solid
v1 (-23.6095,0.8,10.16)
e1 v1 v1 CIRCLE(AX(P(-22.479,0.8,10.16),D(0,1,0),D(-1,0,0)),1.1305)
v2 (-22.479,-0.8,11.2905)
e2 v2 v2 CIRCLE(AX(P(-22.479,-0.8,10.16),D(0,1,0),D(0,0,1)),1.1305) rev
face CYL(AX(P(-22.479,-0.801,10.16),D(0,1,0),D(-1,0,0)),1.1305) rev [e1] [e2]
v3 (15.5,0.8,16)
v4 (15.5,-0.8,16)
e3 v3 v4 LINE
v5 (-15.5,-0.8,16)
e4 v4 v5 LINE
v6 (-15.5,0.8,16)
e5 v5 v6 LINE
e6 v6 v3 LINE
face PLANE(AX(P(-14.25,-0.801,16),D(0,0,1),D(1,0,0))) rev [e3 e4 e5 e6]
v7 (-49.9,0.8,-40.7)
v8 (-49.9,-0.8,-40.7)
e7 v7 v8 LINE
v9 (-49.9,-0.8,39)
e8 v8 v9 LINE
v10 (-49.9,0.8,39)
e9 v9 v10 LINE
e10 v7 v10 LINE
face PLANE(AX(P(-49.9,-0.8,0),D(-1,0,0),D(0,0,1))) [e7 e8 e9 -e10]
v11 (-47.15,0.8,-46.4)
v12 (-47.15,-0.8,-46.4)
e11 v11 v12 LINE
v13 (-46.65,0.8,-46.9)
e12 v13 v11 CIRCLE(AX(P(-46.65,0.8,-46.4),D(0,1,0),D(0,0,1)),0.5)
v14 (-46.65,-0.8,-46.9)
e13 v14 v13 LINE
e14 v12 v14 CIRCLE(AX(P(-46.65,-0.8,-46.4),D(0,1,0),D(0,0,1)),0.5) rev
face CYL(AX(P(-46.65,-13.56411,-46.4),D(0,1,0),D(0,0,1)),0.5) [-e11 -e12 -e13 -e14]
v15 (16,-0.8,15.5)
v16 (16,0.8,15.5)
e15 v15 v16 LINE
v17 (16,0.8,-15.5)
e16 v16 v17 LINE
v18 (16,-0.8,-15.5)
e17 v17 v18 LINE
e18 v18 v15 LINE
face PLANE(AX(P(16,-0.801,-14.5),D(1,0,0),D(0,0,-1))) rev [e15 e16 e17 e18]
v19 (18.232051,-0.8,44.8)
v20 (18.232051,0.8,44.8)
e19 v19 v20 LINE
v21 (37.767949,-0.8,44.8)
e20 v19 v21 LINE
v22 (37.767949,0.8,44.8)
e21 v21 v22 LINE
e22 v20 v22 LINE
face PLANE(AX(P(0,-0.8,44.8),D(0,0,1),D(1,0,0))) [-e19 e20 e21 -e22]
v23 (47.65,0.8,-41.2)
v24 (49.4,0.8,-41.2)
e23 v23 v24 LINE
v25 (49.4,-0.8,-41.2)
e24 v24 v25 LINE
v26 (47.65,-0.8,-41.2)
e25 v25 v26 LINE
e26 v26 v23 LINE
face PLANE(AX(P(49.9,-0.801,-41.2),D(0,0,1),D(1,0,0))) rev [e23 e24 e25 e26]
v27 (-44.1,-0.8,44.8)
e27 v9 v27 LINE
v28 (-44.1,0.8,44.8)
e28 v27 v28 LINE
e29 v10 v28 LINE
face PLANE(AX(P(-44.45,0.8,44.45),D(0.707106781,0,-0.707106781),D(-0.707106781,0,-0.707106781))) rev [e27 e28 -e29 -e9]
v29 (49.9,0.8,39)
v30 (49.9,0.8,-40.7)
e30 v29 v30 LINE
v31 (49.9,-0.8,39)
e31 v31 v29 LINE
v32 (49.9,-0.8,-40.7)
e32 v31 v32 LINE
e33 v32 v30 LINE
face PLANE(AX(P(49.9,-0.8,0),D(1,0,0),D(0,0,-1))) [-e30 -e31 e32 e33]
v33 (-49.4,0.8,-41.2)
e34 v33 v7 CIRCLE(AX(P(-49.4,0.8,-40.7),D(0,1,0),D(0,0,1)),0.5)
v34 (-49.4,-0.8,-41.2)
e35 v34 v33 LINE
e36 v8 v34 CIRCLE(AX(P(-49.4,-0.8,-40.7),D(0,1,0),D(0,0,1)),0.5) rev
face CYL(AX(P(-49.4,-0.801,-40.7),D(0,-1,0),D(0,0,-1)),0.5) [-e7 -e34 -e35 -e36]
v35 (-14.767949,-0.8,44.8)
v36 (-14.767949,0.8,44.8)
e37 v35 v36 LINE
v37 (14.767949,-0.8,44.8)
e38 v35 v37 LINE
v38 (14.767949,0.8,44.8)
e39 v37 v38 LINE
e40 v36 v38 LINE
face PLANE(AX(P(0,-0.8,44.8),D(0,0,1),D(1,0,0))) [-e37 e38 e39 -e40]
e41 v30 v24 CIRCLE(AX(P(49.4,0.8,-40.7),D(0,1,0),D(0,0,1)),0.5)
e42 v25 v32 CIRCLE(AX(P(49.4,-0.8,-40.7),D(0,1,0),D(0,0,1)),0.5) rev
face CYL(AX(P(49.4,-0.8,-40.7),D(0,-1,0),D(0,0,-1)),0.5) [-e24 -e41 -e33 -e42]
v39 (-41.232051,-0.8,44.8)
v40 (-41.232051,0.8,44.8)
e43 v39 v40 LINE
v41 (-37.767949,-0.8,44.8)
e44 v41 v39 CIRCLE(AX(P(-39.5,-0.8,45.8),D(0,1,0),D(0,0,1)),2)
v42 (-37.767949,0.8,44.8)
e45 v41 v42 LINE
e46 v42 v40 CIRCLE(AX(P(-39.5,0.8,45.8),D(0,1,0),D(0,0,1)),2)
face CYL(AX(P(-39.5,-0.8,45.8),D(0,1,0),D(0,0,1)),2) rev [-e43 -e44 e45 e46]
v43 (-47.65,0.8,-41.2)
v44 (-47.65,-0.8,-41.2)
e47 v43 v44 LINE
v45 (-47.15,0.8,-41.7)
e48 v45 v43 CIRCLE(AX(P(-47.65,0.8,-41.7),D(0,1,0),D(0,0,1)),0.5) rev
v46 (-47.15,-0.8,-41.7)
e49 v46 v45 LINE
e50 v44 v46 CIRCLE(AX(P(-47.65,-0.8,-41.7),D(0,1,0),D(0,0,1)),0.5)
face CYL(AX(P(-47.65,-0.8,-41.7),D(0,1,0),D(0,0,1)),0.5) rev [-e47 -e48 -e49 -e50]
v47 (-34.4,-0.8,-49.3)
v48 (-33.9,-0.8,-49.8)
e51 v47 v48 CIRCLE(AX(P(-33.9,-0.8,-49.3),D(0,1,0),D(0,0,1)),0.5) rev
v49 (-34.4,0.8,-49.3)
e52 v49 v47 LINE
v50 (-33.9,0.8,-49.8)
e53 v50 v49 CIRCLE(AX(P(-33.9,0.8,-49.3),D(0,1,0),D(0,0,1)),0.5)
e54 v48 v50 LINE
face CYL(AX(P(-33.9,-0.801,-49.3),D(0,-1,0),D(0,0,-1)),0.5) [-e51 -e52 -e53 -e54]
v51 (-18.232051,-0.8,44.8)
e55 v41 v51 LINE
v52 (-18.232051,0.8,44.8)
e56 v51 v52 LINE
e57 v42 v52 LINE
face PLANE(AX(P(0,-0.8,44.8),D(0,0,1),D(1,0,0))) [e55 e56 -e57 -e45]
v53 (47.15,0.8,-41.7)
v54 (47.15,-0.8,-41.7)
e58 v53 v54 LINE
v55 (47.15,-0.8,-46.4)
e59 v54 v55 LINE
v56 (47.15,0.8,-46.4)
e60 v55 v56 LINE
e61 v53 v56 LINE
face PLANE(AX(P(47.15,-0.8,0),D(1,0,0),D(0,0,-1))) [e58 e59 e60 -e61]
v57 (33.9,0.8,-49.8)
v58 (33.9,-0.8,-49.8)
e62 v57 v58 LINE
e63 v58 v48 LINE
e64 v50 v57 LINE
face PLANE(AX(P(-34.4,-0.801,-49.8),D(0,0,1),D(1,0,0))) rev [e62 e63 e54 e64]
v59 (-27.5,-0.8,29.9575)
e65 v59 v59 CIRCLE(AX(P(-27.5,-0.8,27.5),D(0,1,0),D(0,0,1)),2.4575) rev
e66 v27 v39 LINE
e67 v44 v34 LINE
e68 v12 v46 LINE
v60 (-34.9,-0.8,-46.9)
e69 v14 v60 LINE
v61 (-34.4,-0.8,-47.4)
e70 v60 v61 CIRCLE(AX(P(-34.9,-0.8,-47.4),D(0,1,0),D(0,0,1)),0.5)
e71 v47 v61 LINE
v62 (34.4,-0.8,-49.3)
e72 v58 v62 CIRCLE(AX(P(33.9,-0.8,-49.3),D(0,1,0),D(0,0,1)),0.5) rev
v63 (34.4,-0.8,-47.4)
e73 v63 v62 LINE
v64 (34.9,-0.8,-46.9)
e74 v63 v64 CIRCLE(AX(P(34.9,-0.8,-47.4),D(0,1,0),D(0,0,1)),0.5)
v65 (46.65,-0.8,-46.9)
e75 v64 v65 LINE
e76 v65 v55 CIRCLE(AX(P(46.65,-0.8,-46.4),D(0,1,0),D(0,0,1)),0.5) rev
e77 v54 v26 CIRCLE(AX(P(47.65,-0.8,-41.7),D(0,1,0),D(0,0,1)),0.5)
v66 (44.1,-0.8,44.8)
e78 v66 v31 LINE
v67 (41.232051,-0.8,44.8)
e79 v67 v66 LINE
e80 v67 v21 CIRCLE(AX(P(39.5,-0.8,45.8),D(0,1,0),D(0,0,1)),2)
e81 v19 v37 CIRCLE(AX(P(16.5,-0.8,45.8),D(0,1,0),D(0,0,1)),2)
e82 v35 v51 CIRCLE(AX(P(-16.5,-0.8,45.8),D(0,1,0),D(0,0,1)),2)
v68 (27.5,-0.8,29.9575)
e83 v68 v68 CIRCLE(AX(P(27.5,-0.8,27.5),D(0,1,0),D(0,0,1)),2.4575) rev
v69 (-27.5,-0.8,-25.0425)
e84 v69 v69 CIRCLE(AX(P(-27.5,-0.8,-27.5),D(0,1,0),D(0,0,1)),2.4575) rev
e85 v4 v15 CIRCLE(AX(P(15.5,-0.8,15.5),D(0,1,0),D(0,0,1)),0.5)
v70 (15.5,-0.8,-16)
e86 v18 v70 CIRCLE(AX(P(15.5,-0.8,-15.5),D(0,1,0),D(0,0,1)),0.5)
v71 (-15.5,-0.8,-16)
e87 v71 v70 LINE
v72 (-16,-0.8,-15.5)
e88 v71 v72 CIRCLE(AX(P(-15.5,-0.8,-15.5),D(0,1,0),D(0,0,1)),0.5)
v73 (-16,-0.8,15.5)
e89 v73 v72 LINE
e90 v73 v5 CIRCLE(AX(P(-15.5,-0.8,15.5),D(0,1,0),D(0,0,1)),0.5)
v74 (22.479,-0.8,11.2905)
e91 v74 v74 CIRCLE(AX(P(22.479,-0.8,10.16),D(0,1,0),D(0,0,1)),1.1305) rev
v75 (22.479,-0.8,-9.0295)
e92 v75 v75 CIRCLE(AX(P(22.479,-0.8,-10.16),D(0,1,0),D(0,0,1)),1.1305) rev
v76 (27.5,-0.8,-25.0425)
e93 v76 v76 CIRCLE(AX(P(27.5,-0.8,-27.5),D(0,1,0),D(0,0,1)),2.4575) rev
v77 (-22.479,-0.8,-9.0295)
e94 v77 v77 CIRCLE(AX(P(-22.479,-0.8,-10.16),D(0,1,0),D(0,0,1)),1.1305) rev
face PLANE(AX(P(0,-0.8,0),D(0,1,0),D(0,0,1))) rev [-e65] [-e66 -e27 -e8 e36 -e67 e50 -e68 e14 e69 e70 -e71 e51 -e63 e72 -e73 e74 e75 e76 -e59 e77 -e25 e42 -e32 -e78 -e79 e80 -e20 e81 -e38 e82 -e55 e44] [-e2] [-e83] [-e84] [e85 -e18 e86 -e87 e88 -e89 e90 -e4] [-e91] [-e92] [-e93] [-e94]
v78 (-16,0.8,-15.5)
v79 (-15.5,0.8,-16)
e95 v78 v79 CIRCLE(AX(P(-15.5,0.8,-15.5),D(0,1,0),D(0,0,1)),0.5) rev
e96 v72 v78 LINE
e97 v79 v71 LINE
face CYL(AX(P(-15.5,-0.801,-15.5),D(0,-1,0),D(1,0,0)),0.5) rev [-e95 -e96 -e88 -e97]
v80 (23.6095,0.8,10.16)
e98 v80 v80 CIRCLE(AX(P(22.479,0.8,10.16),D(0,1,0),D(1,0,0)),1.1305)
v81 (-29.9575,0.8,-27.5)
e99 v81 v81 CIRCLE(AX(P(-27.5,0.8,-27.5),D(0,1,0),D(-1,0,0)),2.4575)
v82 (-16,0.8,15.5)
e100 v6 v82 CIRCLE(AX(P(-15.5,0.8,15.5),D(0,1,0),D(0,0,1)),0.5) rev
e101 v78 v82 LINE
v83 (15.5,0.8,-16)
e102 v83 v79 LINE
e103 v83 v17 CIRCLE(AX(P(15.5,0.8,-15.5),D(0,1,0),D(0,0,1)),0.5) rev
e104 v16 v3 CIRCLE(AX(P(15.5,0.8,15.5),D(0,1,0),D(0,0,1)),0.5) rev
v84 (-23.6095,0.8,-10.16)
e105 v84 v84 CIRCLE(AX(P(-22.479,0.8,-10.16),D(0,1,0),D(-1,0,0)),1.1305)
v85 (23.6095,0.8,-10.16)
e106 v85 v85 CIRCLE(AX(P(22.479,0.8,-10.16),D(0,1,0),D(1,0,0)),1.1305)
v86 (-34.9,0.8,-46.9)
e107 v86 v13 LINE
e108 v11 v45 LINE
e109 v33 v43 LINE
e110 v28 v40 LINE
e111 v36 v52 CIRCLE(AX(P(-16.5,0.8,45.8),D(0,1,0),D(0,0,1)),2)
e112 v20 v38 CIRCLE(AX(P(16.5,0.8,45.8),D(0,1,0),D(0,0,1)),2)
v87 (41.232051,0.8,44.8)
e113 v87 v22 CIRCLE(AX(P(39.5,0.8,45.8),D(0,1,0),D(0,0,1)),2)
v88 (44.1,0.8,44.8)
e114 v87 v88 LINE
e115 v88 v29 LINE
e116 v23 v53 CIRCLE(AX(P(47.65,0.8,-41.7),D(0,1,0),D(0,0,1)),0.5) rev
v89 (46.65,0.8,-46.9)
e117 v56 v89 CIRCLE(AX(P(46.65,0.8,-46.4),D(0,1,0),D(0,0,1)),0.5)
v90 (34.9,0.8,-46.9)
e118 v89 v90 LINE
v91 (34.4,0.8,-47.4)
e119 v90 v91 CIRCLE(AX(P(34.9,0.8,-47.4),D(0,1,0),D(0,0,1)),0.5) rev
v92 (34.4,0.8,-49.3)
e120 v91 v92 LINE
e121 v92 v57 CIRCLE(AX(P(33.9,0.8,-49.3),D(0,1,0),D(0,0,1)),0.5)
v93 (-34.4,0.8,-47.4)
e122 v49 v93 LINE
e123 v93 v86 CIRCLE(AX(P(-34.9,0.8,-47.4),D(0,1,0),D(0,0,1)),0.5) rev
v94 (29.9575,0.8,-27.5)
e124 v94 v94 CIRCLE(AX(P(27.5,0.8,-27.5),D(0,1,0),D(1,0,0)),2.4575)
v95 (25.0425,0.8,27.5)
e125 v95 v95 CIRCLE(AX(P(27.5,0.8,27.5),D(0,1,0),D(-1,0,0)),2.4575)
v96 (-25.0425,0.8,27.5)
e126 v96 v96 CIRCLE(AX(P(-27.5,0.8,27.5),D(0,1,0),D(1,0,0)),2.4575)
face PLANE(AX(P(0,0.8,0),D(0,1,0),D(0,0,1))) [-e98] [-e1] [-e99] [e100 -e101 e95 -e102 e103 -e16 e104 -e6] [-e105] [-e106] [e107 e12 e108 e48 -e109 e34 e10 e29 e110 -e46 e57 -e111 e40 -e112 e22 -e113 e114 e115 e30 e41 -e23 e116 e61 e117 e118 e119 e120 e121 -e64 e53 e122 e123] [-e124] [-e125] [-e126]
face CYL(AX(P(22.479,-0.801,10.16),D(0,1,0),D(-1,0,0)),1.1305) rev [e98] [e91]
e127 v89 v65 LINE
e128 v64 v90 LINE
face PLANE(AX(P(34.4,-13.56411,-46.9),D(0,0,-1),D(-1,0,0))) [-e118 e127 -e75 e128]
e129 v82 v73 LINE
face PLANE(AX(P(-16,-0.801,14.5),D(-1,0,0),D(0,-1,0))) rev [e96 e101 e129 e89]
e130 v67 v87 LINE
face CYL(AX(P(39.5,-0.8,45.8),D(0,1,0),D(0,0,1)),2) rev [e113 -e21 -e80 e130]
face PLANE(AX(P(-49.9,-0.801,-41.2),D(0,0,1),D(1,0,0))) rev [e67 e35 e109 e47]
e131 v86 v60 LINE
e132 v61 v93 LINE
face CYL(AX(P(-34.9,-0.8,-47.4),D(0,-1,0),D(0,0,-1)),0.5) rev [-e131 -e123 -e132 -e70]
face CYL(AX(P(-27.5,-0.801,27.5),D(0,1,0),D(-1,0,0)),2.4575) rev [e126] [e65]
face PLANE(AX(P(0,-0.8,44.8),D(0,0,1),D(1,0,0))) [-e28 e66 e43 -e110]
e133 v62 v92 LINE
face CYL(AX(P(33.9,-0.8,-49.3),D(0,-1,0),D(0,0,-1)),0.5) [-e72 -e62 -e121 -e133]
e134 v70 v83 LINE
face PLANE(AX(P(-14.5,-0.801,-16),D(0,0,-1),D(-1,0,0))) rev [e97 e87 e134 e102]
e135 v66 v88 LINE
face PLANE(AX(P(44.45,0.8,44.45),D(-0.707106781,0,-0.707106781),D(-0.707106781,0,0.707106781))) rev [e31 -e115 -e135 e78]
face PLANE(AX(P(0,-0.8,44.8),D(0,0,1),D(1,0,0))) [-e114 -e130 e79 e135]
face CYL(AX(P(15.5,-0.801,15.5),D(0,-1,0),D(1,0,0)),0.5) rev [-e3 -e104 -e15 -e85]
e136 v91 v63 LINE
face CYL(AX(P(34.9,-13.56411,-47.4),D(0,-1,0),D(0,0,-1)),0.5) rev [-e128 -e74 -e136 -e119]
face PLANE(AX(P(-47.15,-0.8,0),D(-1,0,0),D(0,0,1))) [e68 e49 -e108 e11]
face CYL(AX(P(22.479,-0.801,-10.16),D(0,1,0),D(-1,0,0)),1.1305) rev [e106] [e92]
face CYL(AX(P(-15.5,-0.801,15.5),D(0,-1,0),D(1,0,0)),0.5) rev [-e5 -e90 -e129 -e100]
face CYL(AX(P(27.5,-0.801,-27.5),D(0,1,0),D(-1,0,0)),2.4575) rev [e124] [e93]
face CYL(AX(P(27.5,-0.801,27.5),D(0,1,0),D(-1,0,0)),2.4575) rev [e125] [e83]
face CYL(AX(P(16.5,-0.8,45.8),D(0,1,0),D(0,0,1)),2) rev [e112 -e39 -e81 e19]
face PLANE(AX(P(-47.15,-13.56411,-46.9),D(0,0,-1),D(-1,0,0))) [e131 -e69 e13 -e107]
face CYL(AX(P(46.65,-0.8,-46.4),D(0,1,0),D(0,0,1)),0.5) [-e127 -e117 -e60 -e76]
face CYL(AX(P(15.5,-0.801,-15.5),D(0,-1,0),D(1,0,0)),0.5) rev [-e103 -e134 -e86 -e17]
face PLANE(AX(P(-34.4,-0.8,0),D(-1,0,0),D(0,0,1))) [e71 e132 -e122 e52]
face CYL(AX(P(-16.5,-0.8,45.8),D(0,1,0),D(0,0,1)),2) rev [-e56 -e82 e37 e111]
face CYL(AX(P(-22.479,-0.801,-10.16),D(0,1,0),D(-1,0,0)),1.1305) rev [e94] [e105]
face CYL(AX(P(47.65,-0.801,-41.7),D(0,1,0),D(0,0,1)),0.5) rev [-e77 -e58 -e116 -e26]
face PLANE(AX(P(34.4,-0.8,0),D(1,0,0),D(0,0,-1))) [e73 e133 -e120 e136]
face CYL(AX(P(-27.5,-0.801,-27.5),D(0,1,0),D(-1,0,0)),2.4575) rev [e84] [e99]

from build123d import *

# Parameters (mm, degrees)
GENERICCARDPCBDEFINITION_START = -0.8
GENERICCARDPCBDEFINITION_DEPTH = 1.6
CUT_EXTRUDE1_REACH             = 72.517
CUT_EXTRUDE2_REACH             = 72.517
SKETCH8_R                      = 2.4575
FILLET1_R                      = 0.5


# Read off the part's stored shape, not the designer's step: GenericCardPCBDefinition
with BuildPart() as part:
    # GenericCardPCBDefinition outline → GenericCardPCBDefinition (new body)
    with BuildSketch(Plane(origin=(0, 0, 0), x_dir=(1, 0, 0), z_dir=(0, 1, 0)).offset(GENERICCARDPCBDEFINITION_START)):
        with BuildLine():
            Line((-49.9, -39), (-44.1, -44.8))
            Line((-44.1, -44.8), (-41.232050808, -44.8))
            ThreePointArc((-41.232050808, -44.8), (-39.5, -43.8), (-37.767949192, -44.8))
            Line((-37.767949192, -44.8), (-18.232050808, -44.8))
            ThreePointArc((-18.232050808, -44.8), (-16.5, -43.8), (-14.767949192, -44.8))
            Line((-14.767949192, -44.8), (14.767949192, -44.8))
            ThreePointArc((14.767949192, -44.8), (16.5, -43.8), (18.232050808, -44.8))
            Line((18.232050808, -44.8), (37.767949192, -44.8))
            ThreePointArc((37.767949192, -44.8), (39.5, -43.8), (41.232050808, -44.8))
            Line((41.232050808, -44.8), (44.1, -44.8))
            Line((44.1, -44.8), (49.9, -39))
            Line((49.9, -39), (49.9, 40.7))
            ThreePointArc((49.9, 40.7), (49.753553391, 41.053553391), (49.4, 41.2))
            Line((49.4, 41.2), (47.65, 41.2))
            ThreePointArc((47.65, 41.2), (47.296446609, 41.346446609), (47.15, 41.7))
            Line((47.15, 41.7), (47.15, 46.4))
            ThreePointArc((47.15, 46.4), (47.003553391, 46.753553391), (46.65, 46.9))
            Line((46.65, 46.9), (34.9, 46.9))
            ThreePointArc((34.9, 46.9), (34.546446609, 47.046446609), (34.4, 47.4))
            Line((34.4, 47.4), (34.4, 49.3))
            ThreePointArc((34.4, 49.3), (34.253553391, 49.653553391), (33.9, 49.8))
            Line((33.9, 49.8), (-33.9, 49.8))
            ThreePointArc((-33.9, 49.8), (-34.253553391, 49.653553391), (-34.4, 49.3))
            Line((-34.4, 49.3), (-34.4, 47.4))
            ThreePointArc((-34.4, 47.4), (-34.546446609, 47.046446609), (-34.9, 46.9))
            Line((-34.9, 46.9), (-46.65, 46.9))
            ThreePointArc((-46.65, 46.9), (-47.003553391, 46.753553391), (-47.15, 46.4))
            Line((-47.15, 46.4), (-47.15, 41.7))
            ThreePointArc((-47.15, 41.7), (-47.296446609, 41.346446609), (-47.65, 41.2))
            Line((-47.65, 41.2), (-49.4, 41.2))
            ThreePointArc((-49.4, 41.2), (-49.753553391, 41.053553391), (-49.9, 40.7))
            Line((-49.9, 40.7), (-49.9, -39))
        make_face()
    extrude(amount=GENERICCARDPCBDEFINITION_DEPTH)

    # Sketch7 → Cut-Extrude1 (cut, up to next)
    with BuildSketch(Plane(origin=(0, 0.8, 0), x_dir=(1, 0, 0), z_dir=(0, 1, 0)), mode=Mode.PRIVATE) as cut_extrude1_sk1:
        Polygon((16, 14.5), (16, -14.5), (16, -16), (-14.25, -16), (-14.5, -16), (-16, -16), (-16, -14.5), (-16, 14.5), (-16, 16), (-14.5, 16), (-14.25, 16), (2.7929, 16), (3.75, 16), (16, 16), align=None)
    cut_extrude1_tool1 = extrude(cut_extrude1_sk1.sketch, amount=-CUT_EXTRUDE1_REACH, mode=Mode.PRIVATE) & part.part
    add(cut_extrude1_tool1.solids().sort_by_distance((0, 0.8, 0))[0], mode=Mode.SUBTRACT)

    # Sketch8 → Cut-Extrude2 (cut, up to next)
    with BuildSketch(Plane(origin=(0, 0.8, 0), x_dir=(1, 0, 0), z_dir=(0, 1, 0)), mode=Mode.PRIVATE) as cut_extrude2_sk1:
        with Locations(Location((27.5, 27.5, 0), (0, 0, 270))):
            Circle(SKETCH8_R)
    cut_extrude2_tool1 = extrude(cut_extrude2_sk1.sketch, amount=-CUT_EXTRUDE2_REACH, mode=Mode.PRIVATE) & part.part
    # Sketch8 → Cut-Extrude2 (cut, up to next)
    with BuildSketch(Plane(origin=(0, 0.8, 0), x_dir=(1, 0, 0), z_dir=(0, 1, 0)), mode=Mode.PRIVATE) as cut_extrude2_sk2:
        with Locations(Location((-27.5, -27.5, 0), (0, 0, 270))):
            Circle(SKETCH8_R)
    cut_extrude2_tool2 = extrude(cut_extrude2_sk2.sketch, amount=-CUT_EXTRUDE2_REACH, mode=Mode.PRIVATE) & part.part
    # Sketch8 → Cut-Extrude2 (cut, up to next)
    with BuildSketch(Plane(origin=(0, 0.8, 0), x_dir=(1, 0, 0), z_dir=(0, 1, 0)), mode=Mode.PRIVATE) as cut_extrude2_sk3:
        with Locations(Location((27.5, -27.5, 0), (0, 0, 180))):
            Circle(SKETCH8_R)
    cut_extrude2_tool3 = extrude(cut_extrude2_sk3.sketch, amount=-CUT_EXTRUDE2_REACH, mode=Mode.PRIVATE) & part.part
    # Sketch8 → Cut-Extrude2 (cut, up to next)
    with BuildSketch(Plane(origin=(0, 0.8, 0), x_dir=(1, 0, 0), z_dir=(0, 1, 0)), mode=Mode.PRIVATE) as cut_extrude2_sk4:
        with Locations(Location((-27.5, 27.5, 0), (0, 0, 180))):
            Circle(SKETCH8_R)
    cut_extrude2_tool4 = extrude(cut_extrude2_sk4.sketch, amount=-CUT_EXTRUDE2_REACH, mode=Mode.PRIVATE) & part.part
    # Sketch8 → Cut-Extrude2 (cut, up to next)
    with BuildSketch(Plane(origin=(0, 0.8, 0), x_dir=(1, 0, 0), z_dir=(0, 1, 0)), mode=Mode.PRIVATE) as cut_extrude2_sk5:
        with BuildLine():
            ThreePointArc((-22.495277655, 11.290382806), (-23.6095, 10.16), (-22.495277655, 9.029617194))
            ThreePointArc((-22.495277655, 9.029617194), (-21.3485, 10.16), (-22.495277655, 11.290382806))
        make_face()
    cut_extrude2_tool5 = extrude(cut_extrude2_sk5.sketch, amount=-CUT_EXTRUDE2_REACH, mode=Mode.PRIVATE) & part.part
    # Sketch8 → Cut-Extrude2 (cut, up to next)
    with BuildSketch(Plane(origin=(0, 0.8, 0), x_dir=(1, 0, 0), z_dir=(0, 1, 0)), mode=Mode.PRIVATE) as cut_extrude2_sk6:
        with BuildLine():
            ThreePointArc((-22.504884895, -9.02979638), (-23.609238096, -10.135666951), (-22.553502979, -11.288042356))
            ThreePointArc((-22.553502979, -11.288042356), (-21.348761904, -10.184333049), (-22.504884895, -9.02979638))
        make_face()
    cut_extrude2_tool6 = extrude(cut_extrude2_sk6.sketch, amount=-CUT_EXTRUDE2_REACH, mode=Mode.PRIVATE) & part.part
    # Sketch8 → Cut-Extrude2 (cut, up to next)
    with BuildSketch(Plane(origin=(0, 0.8, 0), x_dir=(1, 0, 0), z_dir=(0, 1, 0)), mode=Mode.PRIVATE) as cut_extrude2_sk7:
        with BuildLine():
            ThreePointArc((22.479, 11.2905), (23.6095, 10.16), (22.479, 9.0295))
            ThreePointArc((22.479, 9.0295), (21.3485, 10.16), (22.479, 11.2905))
        make_face()
    cut_extrude2_tool7 = extrude(cut_extrude2_sk7.sketch, amount=-CUT_EXTRUDE2_REACH, mode=Mode.PRIVATE) & part.part
    # Sketch8 → Cut-Extrude2 (cut, up to next)
    with BuildSketch(Plane(origin=(0, 0.8, 0), x_dir=(1, 0, 0), z_dir=(0, 1, 0)), mode=Mode.PRIVATE) as cut_extrude2_sk8:
        with BuildLine():
            ThreePointArc((22.479, -9.0295), (23.6095, -10.16), (22.479, -11.2905))
            ThreePointArc((22.479, -11.2905), (21.3485, -10.16), (22.479, -9.0295))
        make_face()
    cut_extrude2_tool8 = extrude(cut_extrude2_sk8.sketch, amount=-CUT_EXTRUDE2_REACH, mode=Mode.PRIVATE) & part.part
    add(cut_extrude2_tool1.solids().sort_by_distance((27.5, 0.8, -27.5))[0], mode=Mode.SUBTRACT)
    add(cut_extrude2_tool2.solids().sort_by_distance((-27.5, 0.8, 27.5))[0], mode=Mode.SUBTRACT)
    add(cut_extrude2_tool3.solids().sort_by_distance((27.5, 0.8, 27.5))[0], mode=Mode.SUBTRACT)
    add(cut_extrude2_tool4.solids().sort_by_distance((-27.5, 0.8, -27.5))[0], mode=Mode.SUBTRACT)
    add(cut_extrude2_tool5.solids().sort_by_distance((-22.479, 0.8, -10.16))[0], mode=Mode.SUBTRACT)
    add(cut_extrude2_tool6.solids().sort_by_distance((-22.479, 0.8, 10.16))[0], mode=Mode.SUBTRACT)
    add(cut_extrude2_tool7.solids().sort_by_distance((22.479, 0.8, -10.16))[0], mode=Mode.SUBTRACT)
    add(cut_extrude2_tool8.solids().sort_by_distance((22.479, 0.8, 10.16))[0], mode=Mode.SUBTRACT)

    # Fillet1
    fillet1_edges = [part.edges().sort_by_distance(p)[0] for p in [
        (16, 0, -16),
        (16, 0, 16),
        (-16, 0, 16),
        (-16, 0, -16),
    ]]
    fillet(fillet1_edges, radius=FILLET1_R)


solid = part.part
